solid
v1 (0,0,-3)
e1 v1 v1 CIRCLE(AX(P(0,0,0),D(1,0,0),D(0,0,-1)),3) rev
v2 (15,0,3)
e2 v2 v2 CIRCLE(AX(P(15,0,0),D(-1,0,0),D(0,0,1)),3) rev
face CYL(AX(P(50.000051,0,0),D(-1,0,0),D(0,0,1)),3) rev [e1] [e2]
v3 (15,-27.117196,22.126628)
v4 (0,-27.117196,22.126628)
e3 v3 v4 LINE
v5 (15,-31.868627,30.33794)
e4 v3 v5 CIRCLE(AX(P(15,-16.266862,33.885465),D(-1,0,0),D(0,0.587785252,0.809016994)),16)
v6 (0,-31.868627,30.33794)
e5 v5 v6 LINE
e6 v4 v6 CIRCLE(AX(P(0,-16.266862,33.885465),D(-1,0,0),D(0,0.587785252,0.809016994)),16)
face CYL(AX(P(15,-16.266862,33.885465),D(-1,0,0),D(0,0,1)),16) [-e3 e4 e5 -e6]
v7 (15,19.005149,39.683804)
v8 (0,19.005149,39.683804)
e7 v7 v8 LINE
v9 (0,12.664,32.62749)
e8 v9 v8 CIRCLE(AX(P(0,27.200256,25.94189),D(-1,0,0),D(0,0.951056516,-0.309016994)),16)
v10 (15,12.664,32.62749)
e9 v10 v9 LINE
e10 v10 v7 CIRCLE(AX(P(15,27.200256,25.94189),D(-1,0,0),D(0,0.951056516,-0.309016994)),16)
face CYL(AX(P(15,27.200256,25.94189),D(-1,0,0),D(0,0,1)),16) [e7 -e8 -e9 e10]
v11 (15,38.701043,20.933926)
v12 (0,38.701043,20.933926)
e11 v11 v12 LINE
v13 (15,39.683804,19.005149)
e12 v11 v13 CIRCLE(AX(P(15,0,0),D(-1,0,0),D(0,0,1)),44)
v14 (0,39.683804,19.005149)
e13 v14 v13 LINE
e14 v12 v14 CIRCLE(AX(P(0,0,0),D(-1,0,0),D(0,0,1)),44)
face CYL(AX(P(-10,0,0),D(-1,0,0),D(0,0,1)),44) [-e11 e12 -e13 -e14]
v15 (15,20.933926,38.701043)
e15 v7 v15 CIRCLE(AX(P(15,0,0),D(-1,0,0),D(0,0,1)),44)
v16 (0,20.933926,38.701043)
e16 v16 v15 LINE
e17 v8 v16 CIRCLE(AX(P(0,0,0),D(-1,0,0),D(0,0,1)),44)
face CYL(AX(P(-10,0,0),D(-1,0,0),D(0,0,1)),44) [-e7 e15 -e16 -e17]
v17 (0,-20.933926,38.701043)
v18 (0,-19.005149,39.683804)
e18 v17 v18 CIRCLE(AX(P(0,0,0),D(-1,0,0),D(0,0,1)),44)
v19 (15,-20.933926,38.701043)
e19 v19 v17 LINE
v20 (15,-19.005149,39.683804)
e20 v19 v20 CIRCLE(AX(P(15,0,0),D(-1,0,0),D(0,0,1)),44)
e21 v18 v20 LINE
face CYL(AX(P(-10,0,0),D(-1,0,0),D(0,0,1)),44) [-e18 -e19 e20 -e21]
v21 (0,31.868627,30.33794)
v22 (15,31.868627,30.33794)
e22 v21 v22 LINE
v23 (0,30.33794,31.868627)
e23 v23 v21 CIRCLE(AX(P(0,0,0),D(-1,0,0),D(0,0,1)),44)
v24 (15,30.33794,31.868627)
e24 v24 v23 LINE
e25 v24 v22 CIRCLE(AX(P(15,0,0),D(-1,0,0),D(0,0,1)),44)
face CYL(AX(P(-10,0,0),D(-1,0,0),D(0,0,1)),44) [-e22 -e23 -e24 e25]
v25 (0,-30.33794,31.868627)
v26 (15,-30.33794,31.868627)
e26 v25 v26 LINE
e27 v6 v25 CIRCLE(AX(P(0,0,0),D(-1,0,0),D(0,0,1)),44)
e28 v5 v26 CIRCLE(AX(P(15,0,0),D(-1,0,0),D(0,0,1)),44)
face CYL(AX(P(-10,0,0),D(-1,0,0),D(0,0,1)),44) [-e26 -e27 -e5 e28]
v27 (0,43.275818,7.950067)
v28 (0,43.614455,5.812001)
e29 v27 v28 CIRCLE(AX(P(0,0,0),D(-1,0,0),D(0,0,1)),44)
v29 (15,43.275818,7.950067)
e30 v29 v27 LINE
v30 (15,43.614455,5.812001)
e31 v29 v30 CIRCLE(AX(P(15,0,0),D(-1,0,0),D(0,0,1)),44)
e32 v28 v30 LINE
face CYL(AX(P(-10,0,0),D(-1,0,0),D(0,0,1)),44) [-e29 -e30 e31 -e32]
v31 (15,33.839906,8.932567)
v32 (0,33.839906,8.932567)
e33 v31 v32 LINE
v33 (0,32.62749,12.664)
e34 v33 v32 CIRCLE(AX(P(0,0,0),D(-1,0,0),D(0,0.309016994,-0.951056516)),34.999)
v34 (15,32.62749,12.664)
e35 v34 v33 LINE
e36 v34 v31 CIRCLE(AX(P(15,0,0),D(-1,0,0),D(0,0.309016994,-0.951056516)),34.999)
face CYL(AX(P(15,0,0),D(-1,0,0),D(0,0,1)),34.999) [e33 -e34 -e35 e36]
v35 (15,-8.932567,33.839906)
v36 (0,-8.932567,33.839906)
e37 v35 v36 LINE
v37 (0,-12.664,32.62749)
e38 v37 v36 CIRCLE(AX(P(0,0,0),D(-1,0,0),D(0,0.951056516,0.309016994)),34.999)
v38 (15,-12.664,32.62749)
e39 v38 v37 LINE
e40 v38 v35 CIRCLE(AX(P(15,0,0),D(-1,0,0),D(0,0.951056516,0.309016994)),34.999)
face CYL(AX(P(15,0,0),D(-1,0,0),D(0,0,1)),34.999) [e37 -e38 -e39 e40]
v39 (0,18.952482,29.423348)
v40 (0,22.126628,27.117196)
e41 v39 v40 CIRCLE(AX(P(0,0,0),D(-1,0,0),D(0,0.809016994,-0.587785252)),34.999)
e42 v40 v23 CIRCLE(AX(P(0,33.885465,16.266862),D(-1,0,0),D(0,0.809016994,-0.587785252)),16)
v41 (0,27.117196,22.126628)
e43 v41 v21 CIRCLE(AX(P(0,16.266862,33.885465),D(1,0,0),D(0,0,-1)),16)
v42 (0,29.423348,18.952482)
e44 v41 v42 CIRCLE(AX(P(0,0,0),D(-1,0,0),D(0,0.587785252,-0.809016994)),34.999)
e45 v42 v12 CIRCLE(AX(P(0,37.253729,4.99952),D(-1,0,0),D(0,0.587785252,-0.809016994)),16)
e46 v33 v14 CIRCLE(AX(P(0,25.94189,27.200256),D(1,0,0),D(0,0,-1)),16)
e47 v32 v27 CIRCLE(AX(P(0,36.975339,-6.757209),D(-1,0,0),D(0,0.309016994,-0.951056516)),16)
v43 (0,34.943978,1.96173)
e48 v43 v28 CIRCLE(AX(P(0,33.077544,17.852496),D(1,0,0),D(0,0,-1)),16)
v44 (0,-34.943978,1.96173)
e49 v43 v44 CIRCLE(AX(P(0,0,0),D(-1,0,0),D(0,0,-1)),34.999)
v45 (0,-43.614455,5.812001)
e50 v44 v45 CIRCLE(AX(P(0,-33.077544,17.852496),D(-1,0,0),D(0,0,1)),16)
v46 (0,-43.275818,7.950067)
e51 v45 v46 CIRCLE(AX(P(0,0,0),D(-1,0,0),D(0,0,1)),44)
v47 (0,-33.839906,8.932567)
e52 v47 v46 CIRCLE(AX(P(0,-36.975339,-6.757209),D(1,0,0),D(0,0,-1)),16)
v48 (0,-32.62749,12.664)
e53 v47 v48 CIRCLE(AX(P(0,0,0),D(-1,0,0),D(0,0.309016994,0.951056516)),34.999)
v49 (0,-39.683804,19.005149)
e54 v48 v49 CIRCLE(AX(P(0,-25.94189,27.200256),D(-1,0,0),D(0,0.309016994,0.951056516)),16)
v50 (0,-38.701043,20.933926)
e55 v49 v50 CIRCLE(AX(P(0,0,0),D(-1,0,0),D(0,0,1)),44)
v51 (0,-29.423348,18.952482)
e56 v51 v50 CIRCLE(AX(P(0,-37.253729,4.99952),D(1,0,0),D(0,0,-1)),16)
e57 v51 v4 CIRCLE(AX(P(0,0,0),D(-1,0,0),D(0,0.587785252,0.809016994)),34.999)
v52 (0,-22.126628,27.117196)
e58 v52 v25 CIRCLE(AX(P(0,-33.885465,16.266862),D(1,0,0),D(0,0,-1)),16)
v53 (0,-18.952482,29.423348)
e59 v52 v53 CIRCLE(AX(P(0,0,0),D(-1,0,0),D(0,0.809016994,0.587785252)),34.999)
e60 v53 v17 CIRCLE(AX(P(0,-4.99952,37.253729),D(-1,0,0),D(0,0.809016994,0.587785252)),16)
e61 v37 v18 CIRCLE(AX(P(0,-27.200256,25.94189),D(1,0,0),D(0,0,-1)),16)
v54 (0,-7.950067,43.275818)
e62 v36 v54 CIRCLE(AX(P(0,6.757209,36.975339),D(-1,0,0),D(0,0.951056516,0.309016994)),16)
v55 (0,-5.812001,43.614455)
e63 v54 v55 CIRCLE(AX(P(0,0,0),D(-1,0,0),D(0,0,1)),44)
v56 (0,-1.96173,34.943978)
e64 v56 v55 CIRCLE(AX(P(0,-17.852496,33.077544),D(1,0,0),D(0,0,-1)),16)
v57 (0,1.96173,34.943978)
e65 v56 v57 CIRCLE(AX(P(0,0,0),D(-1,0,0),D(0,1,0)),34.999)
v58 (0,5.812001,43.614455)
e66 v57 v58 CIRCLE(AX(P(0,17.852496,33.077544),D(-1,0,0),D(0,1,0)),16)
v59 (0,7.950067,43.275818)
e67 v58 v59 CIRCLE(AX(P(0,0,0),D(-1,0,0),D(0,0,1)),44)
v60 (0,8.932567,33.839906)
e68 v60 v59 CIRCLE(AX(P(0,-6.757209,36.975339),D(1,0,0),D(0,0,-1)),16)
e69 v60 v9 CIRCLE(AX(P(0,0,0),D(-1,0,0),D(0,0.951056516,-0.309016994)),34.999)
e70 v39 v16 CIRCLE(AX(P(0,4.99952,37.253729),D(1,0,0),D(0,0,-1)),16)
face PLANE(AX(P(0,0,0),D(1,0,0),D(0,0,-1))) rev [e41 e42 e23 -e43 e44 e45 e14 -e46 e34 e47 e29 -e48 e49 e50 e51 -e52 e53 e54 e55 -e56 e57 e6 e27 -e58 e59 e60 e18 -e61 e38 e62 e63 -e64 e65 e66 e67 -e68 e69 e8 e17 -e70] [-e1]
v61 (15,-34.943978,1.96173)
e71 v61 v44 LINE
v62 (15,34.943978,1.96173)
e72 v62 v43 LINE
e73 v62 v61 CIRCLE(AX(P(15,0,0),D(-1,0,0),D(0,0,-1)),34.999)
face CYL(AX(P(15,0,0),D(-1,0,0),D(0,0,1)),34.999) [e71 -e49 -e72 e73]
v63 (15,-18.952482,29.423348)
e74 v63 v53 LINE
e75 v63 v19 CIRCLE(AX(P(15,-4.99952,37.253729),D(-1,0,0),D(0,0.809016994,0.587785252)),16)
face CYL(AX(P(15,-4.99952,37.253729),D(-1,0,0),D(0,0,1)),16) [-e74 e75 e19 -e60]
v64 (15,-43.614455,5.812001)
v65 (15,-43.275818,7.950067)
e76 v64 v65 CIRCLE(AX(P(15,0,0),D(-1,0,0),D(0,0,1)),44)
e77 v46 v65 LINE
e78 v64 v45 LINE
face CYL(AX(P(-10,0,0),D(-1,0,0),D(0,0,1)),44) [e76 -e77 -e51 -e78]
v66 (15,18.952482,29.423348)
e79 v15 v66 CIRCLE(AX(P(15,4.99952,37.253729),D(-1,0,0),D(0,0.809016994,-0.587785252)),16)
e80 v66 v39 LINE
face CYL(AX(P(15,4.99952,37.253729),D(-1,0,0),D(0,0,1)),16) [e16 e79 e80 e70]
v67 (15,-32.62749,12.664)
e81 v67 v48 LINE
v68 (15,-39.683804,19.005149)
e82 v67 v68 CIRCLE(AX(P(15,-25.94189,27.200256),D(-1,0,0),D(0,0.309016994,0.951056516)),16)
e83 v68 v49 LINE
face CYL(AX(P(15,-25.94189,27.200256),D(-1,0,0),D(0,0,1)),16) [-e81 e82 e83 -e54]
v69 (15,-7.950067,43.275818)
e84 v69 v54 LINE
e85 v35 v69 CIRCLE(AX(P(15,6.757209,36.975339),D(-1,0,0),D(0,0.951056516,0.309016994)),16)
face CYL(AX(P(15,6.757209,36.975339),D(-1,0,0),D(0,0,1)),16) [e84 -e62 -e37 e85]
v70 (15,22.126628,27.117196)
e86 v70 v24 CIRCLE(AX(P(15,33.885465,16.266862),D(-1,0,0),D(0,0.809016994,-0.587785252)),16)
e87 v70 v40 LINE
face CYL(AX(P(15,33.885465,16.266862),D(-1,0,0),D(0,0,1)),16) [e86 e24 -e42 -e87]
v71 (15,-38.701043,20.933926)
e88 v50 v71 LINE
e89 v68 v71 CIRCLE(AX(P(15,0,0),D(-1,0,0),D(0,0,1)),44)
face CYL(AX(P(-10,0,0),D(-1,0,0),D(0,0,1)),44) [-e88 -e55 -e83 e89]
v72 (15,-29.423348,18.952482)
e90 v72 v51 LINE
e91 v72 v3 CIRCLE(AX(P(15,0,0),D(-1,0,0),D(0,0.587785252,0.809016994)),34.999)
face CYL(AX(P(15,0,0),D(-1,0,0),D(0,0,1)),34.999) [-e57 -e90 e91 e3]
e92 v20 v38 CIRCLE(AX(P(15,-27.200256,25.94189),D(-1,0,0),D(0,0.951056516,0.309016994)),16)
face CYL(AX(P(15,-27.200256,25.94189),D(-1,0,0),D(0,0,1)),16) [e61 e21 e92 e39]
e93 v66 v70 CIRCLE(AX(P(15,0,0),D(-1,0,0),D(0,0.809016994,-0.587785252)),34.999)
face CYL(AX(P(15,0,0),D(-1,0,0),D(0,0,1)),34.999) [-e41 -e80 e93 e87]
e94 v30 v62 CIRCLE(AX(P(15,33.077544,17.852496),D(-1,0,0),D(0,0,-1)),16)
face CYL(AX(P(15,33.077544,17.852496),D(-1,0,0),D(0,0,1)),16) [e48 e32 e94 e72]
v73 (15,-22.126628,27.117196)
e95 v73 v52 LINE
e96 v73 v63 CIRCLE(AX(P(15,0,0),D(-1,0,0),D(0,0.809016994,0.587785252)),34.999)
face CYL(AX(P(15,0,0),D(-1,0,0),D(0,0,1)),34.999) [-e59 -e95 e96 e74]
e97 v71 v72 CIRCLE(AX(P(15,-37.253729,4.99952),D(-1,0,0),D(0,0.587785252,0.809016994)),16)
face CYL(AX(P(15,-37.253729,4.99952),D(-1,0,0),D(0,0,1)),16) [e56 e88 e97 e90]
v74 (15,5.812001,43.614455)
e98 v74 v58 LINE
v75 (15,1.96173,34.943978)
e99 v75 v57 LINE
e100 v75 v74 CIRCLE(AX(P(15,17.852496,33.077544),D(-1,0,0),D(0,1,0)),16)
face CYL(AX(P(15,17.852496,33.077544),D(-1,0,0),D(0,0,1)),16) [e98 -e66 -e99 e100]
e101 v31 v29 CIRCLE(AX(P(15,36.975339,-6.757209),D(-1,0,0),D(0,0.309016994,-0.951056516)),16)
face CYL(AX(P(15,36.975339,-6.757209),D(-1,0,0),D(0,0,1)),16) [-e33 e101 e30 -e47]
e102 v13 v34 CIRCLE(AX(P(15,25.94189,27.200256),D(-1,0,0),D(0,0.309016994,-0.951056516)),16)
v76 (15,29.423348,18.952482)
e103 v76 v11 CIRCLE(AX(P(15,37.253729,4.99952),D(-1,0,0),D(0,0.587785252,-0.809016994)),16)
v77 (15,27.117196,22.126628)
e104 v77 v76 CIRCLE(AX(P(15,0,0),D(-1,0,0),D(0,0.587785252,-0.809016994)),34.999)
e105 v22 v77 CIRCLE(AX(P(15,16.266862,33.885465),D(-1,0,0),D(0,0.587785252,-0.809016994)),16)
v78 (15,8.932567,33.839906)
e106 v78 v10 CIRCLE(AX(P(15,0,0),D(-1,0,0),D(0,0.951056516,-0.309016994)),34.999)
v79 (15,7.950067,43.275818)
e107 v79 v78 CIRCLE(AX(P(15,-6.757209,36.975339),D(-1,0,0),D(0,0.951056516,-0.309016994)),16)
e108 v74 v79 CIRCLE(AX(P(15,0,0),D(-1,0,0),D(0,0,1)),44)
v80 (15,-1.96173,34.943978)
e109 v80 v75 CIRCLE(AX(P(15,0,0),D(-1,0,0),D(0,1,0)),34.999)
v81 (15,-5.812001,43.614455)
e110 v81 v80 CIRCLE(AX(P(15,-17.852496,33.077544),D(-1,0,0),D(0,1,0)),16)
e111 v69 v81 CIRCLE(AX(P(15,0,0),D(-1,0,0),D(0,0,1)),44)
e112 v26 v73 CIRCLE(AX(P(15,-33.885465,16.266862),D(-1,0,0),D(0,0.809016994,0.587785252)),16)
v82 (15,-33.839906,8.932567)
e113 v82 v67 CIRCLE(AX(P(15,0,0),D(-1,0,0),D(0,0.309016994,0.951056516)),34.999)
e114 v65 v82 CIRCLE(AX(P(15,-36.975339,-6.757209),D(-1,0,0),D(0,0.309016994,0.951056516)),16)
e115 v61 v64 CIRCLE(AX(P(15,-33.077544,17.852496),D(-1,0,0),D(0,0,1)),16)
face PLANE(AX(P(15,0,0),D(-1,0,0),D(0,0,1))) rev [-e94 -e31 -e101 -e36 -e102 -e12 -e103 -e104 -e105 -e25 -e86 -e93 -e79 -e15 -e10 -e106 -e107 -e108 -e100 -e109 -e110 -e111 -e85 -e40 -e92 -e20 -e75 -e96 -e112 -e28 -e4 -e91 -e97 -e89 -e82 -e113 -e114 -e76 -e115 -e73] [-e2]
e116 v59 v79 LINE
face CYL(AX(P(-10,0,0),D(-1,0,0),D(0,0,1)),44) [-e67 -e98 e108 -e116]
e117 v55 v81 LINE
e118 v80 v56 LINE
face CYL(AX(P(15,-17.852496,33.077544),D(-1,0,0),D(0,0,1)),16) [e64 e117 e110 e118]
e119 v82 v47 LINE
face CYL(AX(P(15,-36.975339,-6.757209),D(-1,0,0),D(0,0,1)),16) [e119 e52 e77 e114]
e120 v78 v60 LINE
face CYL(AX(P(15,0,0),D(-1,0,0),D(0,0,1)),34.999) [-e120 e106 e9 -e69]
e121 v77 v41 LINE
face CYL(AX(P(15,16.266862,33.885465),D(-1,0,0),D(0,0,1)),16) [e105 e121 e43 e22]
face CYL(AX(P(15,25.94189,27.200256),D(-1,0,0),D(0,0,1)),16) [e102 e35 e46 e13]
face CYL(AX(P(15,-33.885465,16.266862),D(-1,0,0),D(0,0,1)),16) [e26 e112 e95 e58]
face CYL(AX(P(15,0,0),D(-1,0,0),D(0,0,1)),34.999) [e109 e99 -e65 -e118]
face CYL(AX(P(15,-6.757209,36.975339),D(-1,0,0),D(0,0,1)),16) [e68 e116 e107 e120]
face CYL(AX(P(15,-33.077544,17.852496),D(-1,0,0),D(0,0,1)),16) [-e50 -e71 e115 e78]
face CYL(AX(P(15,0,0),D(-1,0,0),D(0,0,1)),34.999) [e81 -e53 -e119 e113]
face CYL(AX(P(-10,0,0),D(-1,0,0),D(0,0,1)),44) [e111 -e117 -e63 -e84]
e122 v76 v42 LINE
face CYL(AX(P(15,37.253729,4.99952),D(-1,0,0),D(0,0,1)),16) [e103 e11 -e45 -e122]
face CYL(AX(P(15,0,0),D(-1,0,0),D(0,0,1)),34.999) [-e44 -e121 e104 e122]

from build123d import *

# Parameters (mm, degrees)
BASPROSKE_W        = 15
BASPROSKE_H        = 44
TOOTHCUT_DEPTH     = 65.007812023
TEETHCUTS_DEPTH    = 15
BORSKE_R           = 3
BORE_DEPTH         = 50.0000508
CUT_EXTRUDE1_REACH = 65.743


# Read off the part's stored shape, not the designer's step: TeethCuts
with BuildPart() as part:
    # BasProSke → Base-Revolve (revolve)
    with BuildSketch(Plane(origin=(0, 0, 0), x_dir=(1, 0, 0), z_dir=(0, 1, 0)), mode=Mode.PRIVATE) as base_revolve_sk:
        with Locations((7.5, 22)):
            Rectangle(BASPROSKE_W, BASPROSKE_H)
    revolve(base_revolve_sk.sketch.rotate(Axis((-10, 0, 0), (1, 0, 0)), 180), axis=Axis((-10, 0, 0), (1, 0, 0)))

    # TooCutSke → ToothCut (cut, through all)
    with BuildSketch(Plane(origin=(0, 0, 0), x_dir=(0, 0, -1), z_dir=(1, 0, 0))):
        with BuildLine():
            ThreePointArc((1.961730392, 34.943978235), (0, 34.999), (-1.961730392, 34.943978235))
            ThreePointArc((-1.961730392, 34.943978235), (-3.235659864, 39.585086827), (-5.832115241, 43.637395396))
            ThreePointArc((-5.832115241, 43.637395396), (0, 44.0254), (5.832115241, 43.637395396))
            ThreePointArc((5.832115241, 43.637395396), (3.235659864, 39.585086827), (1.961730392, 34.943978235))
        make_face()
    extrude(amount=TOOTHCUT_DEPTH, mode=Mode.SUBTRACT)

    # TeethCuts outline → TeethCuts (cut)
    with BuildSketch(Plane.YZ):
        with BuildLine():
            ThreePointArc((39.683804298, 19.005148682), (36.636439054, 15.299557845), (32.627490176, 12.663999598))
            ThreePointArc((32.627490176, 12.663999598), (33.286027014, 10.815285786), (33.839906235, 8.932566653))
            ThreePointArc((33.839906235, 8.932566653), (38.632356276, 9.156756269), (43.275818192, 7.950066657))
            ThreePointArc((43.275818192, 7.950066657), (41.846486717, 13.596747753), (39.683804298, 19.005148682))
        make_face()
        with BuildLine():
            ThreePointArc((-34.943978235, 1.961730392), (-39.571147477, 3.229461904), (-43.614454593, 5.812000568))
            ThreePointArc((-43.614454593, 5.812000568), (-44, 0), (-43.614454592, -5.812000568))
            ThreePointArc((-43.614454592, -5.812000568), (-39.571147477, -3.229461904), (-34.943978235, -1.961730392))
            ThreePointArc((-34.943978235, -1.961730392), (-34.999, 0), (-34.943978235, 1.961730392))
        make_face()
        with BuildLine():
            ThreePointArc((-32.627490176, 12.663999598), (-36.636439054, 15.299557845), (-39.683804298, 19.005148682))
            ThreePointArc((-39.683804298, 19.005148682), (-41.846486717, 13.596747753), (-43.275818192, 7.950066657))
            ThreePointArc((-43.275818192, 7.950066657), (-38.632356276, 9.156756269), (-33.839906235, 8.932566653))
            ThreePointArc((-33.839906235, 8.932566653), (-33.286027014, 10.815285786), (-32.627490176, 12.663999598))
        make_face()
        with BuildLine():
            ThreePointArc((-27.117196049, 22.126628289), (-30.115500715, 25.872026467), (-31.868626746, 30.337940427))
            ThreePointArc((-31.868626746, 30.337940427), (-35.596747753, 25.862551101), (-38.701043186, 20.933925966))
            ThreePointArc((-38.701043186, 20.933925966), (-33.911960876, 20.64664734), (-29.423348436, 18.952481837))
            ThreePointArc((-29.423348436, 18.952481837), (-28.314785786, 20.571896045), (-27.117196049, 22.126628289))
        make_face()
        with BuildLine():
            ThreePointArc((-18.952481837, 29.423348436), (-20.64664734, 33.911960876), (-20.933925966, 38.701043186))
            ThreePointArc((-20.933925966, 38.701043186), (-25.862551101, 35.596747753), (-30.337940427, 31.868626746))
            ThreePointArc((-30.337940427, 31.868626746), (-25.872026467, 30.115500715), (-22.126628289, 27.117196049))
            ThreePointArc((-22.126628289, 27.117196049), (-20.571896045, 28.314785786), (-18.952481837, 29.423348436))
        make_face()
        with BuildLine():
            ThreePointArc((-8.932566653, 33.839906235), (-9.156756269, 38.632356276), (-7.950066657, 43.275818192))
            ThreePointArc((-7.950066657, 43.275818192), (-13.596747753, 41.846486717), (-19.005148682, 39.683804298))
            ThreePointArc((-19.005148682, 39.683804298), (-15.299557845, 36.636439054), (-12.663999598, 32.627490176))
            ThreePointArc((-12.663999598, 32.627490176), (-10.815285786, 33.286027014), (-8.932566653, 33.839906235))
        make_face()
        with BuildLine():
            ThreePointArc((1.961730392, 34.943978235), (3.229461904, 39.571147477), (5.812000568, 43.614454593))
            ThreePointArc((5.812000568, 43.614454593), (0, 44), (-5.812000568, 43.614454593))
            ThreePointArc((-5.812000568, 43.614454593), (-3.229461904, 39.571147477), (-1.961730392, 34.943978235))
            ThreePointArc((-1.961730392, 34.943978235), (0, 34.999), (1.961730392, 34.943978235))
        make_face()
        with BuildLine():
            ThreePointArc((12.663999598, 32.627490176), (15.299557845, 36.636439054), (19.005148682, 39.683804298))
            ThreePointArc((19.005148682, 39.683804298), (13.596747753, 41.846486717), (7.950066657, 43.275818192))
            ThreePointArc((7.950066657, 43.275818192), (9.156756269, 38.632356276), (8.932566653, 33.839906235))
            ThreePointArc((8.932566653, 33.839906235), (10.815285786, 33.286027014), (12.663999598, 32.627490176))
        make_face()
        with BuildLine():
            ThreePointArc((22.126628289, 27.117196049), (25.872026467, 30.115500715), (30.337940427, 31.868626746))
            ThreePointArc((30.337940427, 31.868626746), (25.862551101, 35.596747753), (20.933925966, 38.701043186))
            ThreePointArc((20.933925966, 38.701043186), (20.64664734, 33.911960876), (18.952481837, 29.423348436))
            ThreePointArc((18.952481837, 29.423348436), (20.571896045, 28.314785786), (22.126628289, 27.117196049))
        make_face()
        with BuildLine():
            ThreePointArc((29.423348436, 18.952481837), (33.911960876, 20.64664734), (38.701043186, 20.933925966))
            ThreePointArc((38.701043186, 20.933925966), (35.596747753, 25.862551101), (31.868626746, 30.337940427))
            ThreePointArc((31.868626746, 30.337940427), (30.115500715, 25.872026467), (27.117196049, 22.126628289))
            ThreePointArc((27.117196049, 22.126628289), (28.314785786, 20.571896045), (29.423348436, 18.952481837))
        make_face()
    extrude(amount=TEETHCUTS_DEPTH, mode=Mode.SUBTRACT)

    # BorSke → Bore (cut, symmetric)
    with BuildSketch(Plane(origin=(0, 0, 0), x_dir=(0, 0, -1), z_dir=(1, 0, 0))):
        with Locations(Location((0, 0, 0), (0, 0, 180))):
            Circle(BORSKE_R)
    extrude(amount=BORE_DEPTH, both=True, mode=Mode.SUBTRACT)

    # Sketch2 → Cut-Extrude1 (cut, up to next)
    with BuildSketch(Plane(origin=(15, 0, 0), x_dir=(0, 0, -1), z_dir=(1, 0, 0)), mode=Mode.PRIVATE) as cut_extrude1_sk1:
        with BuildLine():
            Line((1.961730392, -34.943978235), (2.123495302, -44.219744966))
            ThreePointArc((2.123495302, -44.219744966), (44.2706282, 0.080968685), (1.961730392, 44.227216632))
            Line((1.961730392, 44.227216632), (1.961730392, 34.943978235))
            ThreePointArc((1.961730392, 34.943978235), (34.999, 0), (1.961730392, -34.943978235))
        make_face()
    cut_extrude1_tool1 = extrude(cut_extrude1_sk1.sketch, amount=-CUT_EXTRUDE1_REACH, mode=Mode.PRIVATE) & part.part
    add(cut_extrude1_tool1.solids().sort_by_distance((15, 39.585597, -2.942185))[0], mode=Mode.SUBTRACT)


solid = part.part
